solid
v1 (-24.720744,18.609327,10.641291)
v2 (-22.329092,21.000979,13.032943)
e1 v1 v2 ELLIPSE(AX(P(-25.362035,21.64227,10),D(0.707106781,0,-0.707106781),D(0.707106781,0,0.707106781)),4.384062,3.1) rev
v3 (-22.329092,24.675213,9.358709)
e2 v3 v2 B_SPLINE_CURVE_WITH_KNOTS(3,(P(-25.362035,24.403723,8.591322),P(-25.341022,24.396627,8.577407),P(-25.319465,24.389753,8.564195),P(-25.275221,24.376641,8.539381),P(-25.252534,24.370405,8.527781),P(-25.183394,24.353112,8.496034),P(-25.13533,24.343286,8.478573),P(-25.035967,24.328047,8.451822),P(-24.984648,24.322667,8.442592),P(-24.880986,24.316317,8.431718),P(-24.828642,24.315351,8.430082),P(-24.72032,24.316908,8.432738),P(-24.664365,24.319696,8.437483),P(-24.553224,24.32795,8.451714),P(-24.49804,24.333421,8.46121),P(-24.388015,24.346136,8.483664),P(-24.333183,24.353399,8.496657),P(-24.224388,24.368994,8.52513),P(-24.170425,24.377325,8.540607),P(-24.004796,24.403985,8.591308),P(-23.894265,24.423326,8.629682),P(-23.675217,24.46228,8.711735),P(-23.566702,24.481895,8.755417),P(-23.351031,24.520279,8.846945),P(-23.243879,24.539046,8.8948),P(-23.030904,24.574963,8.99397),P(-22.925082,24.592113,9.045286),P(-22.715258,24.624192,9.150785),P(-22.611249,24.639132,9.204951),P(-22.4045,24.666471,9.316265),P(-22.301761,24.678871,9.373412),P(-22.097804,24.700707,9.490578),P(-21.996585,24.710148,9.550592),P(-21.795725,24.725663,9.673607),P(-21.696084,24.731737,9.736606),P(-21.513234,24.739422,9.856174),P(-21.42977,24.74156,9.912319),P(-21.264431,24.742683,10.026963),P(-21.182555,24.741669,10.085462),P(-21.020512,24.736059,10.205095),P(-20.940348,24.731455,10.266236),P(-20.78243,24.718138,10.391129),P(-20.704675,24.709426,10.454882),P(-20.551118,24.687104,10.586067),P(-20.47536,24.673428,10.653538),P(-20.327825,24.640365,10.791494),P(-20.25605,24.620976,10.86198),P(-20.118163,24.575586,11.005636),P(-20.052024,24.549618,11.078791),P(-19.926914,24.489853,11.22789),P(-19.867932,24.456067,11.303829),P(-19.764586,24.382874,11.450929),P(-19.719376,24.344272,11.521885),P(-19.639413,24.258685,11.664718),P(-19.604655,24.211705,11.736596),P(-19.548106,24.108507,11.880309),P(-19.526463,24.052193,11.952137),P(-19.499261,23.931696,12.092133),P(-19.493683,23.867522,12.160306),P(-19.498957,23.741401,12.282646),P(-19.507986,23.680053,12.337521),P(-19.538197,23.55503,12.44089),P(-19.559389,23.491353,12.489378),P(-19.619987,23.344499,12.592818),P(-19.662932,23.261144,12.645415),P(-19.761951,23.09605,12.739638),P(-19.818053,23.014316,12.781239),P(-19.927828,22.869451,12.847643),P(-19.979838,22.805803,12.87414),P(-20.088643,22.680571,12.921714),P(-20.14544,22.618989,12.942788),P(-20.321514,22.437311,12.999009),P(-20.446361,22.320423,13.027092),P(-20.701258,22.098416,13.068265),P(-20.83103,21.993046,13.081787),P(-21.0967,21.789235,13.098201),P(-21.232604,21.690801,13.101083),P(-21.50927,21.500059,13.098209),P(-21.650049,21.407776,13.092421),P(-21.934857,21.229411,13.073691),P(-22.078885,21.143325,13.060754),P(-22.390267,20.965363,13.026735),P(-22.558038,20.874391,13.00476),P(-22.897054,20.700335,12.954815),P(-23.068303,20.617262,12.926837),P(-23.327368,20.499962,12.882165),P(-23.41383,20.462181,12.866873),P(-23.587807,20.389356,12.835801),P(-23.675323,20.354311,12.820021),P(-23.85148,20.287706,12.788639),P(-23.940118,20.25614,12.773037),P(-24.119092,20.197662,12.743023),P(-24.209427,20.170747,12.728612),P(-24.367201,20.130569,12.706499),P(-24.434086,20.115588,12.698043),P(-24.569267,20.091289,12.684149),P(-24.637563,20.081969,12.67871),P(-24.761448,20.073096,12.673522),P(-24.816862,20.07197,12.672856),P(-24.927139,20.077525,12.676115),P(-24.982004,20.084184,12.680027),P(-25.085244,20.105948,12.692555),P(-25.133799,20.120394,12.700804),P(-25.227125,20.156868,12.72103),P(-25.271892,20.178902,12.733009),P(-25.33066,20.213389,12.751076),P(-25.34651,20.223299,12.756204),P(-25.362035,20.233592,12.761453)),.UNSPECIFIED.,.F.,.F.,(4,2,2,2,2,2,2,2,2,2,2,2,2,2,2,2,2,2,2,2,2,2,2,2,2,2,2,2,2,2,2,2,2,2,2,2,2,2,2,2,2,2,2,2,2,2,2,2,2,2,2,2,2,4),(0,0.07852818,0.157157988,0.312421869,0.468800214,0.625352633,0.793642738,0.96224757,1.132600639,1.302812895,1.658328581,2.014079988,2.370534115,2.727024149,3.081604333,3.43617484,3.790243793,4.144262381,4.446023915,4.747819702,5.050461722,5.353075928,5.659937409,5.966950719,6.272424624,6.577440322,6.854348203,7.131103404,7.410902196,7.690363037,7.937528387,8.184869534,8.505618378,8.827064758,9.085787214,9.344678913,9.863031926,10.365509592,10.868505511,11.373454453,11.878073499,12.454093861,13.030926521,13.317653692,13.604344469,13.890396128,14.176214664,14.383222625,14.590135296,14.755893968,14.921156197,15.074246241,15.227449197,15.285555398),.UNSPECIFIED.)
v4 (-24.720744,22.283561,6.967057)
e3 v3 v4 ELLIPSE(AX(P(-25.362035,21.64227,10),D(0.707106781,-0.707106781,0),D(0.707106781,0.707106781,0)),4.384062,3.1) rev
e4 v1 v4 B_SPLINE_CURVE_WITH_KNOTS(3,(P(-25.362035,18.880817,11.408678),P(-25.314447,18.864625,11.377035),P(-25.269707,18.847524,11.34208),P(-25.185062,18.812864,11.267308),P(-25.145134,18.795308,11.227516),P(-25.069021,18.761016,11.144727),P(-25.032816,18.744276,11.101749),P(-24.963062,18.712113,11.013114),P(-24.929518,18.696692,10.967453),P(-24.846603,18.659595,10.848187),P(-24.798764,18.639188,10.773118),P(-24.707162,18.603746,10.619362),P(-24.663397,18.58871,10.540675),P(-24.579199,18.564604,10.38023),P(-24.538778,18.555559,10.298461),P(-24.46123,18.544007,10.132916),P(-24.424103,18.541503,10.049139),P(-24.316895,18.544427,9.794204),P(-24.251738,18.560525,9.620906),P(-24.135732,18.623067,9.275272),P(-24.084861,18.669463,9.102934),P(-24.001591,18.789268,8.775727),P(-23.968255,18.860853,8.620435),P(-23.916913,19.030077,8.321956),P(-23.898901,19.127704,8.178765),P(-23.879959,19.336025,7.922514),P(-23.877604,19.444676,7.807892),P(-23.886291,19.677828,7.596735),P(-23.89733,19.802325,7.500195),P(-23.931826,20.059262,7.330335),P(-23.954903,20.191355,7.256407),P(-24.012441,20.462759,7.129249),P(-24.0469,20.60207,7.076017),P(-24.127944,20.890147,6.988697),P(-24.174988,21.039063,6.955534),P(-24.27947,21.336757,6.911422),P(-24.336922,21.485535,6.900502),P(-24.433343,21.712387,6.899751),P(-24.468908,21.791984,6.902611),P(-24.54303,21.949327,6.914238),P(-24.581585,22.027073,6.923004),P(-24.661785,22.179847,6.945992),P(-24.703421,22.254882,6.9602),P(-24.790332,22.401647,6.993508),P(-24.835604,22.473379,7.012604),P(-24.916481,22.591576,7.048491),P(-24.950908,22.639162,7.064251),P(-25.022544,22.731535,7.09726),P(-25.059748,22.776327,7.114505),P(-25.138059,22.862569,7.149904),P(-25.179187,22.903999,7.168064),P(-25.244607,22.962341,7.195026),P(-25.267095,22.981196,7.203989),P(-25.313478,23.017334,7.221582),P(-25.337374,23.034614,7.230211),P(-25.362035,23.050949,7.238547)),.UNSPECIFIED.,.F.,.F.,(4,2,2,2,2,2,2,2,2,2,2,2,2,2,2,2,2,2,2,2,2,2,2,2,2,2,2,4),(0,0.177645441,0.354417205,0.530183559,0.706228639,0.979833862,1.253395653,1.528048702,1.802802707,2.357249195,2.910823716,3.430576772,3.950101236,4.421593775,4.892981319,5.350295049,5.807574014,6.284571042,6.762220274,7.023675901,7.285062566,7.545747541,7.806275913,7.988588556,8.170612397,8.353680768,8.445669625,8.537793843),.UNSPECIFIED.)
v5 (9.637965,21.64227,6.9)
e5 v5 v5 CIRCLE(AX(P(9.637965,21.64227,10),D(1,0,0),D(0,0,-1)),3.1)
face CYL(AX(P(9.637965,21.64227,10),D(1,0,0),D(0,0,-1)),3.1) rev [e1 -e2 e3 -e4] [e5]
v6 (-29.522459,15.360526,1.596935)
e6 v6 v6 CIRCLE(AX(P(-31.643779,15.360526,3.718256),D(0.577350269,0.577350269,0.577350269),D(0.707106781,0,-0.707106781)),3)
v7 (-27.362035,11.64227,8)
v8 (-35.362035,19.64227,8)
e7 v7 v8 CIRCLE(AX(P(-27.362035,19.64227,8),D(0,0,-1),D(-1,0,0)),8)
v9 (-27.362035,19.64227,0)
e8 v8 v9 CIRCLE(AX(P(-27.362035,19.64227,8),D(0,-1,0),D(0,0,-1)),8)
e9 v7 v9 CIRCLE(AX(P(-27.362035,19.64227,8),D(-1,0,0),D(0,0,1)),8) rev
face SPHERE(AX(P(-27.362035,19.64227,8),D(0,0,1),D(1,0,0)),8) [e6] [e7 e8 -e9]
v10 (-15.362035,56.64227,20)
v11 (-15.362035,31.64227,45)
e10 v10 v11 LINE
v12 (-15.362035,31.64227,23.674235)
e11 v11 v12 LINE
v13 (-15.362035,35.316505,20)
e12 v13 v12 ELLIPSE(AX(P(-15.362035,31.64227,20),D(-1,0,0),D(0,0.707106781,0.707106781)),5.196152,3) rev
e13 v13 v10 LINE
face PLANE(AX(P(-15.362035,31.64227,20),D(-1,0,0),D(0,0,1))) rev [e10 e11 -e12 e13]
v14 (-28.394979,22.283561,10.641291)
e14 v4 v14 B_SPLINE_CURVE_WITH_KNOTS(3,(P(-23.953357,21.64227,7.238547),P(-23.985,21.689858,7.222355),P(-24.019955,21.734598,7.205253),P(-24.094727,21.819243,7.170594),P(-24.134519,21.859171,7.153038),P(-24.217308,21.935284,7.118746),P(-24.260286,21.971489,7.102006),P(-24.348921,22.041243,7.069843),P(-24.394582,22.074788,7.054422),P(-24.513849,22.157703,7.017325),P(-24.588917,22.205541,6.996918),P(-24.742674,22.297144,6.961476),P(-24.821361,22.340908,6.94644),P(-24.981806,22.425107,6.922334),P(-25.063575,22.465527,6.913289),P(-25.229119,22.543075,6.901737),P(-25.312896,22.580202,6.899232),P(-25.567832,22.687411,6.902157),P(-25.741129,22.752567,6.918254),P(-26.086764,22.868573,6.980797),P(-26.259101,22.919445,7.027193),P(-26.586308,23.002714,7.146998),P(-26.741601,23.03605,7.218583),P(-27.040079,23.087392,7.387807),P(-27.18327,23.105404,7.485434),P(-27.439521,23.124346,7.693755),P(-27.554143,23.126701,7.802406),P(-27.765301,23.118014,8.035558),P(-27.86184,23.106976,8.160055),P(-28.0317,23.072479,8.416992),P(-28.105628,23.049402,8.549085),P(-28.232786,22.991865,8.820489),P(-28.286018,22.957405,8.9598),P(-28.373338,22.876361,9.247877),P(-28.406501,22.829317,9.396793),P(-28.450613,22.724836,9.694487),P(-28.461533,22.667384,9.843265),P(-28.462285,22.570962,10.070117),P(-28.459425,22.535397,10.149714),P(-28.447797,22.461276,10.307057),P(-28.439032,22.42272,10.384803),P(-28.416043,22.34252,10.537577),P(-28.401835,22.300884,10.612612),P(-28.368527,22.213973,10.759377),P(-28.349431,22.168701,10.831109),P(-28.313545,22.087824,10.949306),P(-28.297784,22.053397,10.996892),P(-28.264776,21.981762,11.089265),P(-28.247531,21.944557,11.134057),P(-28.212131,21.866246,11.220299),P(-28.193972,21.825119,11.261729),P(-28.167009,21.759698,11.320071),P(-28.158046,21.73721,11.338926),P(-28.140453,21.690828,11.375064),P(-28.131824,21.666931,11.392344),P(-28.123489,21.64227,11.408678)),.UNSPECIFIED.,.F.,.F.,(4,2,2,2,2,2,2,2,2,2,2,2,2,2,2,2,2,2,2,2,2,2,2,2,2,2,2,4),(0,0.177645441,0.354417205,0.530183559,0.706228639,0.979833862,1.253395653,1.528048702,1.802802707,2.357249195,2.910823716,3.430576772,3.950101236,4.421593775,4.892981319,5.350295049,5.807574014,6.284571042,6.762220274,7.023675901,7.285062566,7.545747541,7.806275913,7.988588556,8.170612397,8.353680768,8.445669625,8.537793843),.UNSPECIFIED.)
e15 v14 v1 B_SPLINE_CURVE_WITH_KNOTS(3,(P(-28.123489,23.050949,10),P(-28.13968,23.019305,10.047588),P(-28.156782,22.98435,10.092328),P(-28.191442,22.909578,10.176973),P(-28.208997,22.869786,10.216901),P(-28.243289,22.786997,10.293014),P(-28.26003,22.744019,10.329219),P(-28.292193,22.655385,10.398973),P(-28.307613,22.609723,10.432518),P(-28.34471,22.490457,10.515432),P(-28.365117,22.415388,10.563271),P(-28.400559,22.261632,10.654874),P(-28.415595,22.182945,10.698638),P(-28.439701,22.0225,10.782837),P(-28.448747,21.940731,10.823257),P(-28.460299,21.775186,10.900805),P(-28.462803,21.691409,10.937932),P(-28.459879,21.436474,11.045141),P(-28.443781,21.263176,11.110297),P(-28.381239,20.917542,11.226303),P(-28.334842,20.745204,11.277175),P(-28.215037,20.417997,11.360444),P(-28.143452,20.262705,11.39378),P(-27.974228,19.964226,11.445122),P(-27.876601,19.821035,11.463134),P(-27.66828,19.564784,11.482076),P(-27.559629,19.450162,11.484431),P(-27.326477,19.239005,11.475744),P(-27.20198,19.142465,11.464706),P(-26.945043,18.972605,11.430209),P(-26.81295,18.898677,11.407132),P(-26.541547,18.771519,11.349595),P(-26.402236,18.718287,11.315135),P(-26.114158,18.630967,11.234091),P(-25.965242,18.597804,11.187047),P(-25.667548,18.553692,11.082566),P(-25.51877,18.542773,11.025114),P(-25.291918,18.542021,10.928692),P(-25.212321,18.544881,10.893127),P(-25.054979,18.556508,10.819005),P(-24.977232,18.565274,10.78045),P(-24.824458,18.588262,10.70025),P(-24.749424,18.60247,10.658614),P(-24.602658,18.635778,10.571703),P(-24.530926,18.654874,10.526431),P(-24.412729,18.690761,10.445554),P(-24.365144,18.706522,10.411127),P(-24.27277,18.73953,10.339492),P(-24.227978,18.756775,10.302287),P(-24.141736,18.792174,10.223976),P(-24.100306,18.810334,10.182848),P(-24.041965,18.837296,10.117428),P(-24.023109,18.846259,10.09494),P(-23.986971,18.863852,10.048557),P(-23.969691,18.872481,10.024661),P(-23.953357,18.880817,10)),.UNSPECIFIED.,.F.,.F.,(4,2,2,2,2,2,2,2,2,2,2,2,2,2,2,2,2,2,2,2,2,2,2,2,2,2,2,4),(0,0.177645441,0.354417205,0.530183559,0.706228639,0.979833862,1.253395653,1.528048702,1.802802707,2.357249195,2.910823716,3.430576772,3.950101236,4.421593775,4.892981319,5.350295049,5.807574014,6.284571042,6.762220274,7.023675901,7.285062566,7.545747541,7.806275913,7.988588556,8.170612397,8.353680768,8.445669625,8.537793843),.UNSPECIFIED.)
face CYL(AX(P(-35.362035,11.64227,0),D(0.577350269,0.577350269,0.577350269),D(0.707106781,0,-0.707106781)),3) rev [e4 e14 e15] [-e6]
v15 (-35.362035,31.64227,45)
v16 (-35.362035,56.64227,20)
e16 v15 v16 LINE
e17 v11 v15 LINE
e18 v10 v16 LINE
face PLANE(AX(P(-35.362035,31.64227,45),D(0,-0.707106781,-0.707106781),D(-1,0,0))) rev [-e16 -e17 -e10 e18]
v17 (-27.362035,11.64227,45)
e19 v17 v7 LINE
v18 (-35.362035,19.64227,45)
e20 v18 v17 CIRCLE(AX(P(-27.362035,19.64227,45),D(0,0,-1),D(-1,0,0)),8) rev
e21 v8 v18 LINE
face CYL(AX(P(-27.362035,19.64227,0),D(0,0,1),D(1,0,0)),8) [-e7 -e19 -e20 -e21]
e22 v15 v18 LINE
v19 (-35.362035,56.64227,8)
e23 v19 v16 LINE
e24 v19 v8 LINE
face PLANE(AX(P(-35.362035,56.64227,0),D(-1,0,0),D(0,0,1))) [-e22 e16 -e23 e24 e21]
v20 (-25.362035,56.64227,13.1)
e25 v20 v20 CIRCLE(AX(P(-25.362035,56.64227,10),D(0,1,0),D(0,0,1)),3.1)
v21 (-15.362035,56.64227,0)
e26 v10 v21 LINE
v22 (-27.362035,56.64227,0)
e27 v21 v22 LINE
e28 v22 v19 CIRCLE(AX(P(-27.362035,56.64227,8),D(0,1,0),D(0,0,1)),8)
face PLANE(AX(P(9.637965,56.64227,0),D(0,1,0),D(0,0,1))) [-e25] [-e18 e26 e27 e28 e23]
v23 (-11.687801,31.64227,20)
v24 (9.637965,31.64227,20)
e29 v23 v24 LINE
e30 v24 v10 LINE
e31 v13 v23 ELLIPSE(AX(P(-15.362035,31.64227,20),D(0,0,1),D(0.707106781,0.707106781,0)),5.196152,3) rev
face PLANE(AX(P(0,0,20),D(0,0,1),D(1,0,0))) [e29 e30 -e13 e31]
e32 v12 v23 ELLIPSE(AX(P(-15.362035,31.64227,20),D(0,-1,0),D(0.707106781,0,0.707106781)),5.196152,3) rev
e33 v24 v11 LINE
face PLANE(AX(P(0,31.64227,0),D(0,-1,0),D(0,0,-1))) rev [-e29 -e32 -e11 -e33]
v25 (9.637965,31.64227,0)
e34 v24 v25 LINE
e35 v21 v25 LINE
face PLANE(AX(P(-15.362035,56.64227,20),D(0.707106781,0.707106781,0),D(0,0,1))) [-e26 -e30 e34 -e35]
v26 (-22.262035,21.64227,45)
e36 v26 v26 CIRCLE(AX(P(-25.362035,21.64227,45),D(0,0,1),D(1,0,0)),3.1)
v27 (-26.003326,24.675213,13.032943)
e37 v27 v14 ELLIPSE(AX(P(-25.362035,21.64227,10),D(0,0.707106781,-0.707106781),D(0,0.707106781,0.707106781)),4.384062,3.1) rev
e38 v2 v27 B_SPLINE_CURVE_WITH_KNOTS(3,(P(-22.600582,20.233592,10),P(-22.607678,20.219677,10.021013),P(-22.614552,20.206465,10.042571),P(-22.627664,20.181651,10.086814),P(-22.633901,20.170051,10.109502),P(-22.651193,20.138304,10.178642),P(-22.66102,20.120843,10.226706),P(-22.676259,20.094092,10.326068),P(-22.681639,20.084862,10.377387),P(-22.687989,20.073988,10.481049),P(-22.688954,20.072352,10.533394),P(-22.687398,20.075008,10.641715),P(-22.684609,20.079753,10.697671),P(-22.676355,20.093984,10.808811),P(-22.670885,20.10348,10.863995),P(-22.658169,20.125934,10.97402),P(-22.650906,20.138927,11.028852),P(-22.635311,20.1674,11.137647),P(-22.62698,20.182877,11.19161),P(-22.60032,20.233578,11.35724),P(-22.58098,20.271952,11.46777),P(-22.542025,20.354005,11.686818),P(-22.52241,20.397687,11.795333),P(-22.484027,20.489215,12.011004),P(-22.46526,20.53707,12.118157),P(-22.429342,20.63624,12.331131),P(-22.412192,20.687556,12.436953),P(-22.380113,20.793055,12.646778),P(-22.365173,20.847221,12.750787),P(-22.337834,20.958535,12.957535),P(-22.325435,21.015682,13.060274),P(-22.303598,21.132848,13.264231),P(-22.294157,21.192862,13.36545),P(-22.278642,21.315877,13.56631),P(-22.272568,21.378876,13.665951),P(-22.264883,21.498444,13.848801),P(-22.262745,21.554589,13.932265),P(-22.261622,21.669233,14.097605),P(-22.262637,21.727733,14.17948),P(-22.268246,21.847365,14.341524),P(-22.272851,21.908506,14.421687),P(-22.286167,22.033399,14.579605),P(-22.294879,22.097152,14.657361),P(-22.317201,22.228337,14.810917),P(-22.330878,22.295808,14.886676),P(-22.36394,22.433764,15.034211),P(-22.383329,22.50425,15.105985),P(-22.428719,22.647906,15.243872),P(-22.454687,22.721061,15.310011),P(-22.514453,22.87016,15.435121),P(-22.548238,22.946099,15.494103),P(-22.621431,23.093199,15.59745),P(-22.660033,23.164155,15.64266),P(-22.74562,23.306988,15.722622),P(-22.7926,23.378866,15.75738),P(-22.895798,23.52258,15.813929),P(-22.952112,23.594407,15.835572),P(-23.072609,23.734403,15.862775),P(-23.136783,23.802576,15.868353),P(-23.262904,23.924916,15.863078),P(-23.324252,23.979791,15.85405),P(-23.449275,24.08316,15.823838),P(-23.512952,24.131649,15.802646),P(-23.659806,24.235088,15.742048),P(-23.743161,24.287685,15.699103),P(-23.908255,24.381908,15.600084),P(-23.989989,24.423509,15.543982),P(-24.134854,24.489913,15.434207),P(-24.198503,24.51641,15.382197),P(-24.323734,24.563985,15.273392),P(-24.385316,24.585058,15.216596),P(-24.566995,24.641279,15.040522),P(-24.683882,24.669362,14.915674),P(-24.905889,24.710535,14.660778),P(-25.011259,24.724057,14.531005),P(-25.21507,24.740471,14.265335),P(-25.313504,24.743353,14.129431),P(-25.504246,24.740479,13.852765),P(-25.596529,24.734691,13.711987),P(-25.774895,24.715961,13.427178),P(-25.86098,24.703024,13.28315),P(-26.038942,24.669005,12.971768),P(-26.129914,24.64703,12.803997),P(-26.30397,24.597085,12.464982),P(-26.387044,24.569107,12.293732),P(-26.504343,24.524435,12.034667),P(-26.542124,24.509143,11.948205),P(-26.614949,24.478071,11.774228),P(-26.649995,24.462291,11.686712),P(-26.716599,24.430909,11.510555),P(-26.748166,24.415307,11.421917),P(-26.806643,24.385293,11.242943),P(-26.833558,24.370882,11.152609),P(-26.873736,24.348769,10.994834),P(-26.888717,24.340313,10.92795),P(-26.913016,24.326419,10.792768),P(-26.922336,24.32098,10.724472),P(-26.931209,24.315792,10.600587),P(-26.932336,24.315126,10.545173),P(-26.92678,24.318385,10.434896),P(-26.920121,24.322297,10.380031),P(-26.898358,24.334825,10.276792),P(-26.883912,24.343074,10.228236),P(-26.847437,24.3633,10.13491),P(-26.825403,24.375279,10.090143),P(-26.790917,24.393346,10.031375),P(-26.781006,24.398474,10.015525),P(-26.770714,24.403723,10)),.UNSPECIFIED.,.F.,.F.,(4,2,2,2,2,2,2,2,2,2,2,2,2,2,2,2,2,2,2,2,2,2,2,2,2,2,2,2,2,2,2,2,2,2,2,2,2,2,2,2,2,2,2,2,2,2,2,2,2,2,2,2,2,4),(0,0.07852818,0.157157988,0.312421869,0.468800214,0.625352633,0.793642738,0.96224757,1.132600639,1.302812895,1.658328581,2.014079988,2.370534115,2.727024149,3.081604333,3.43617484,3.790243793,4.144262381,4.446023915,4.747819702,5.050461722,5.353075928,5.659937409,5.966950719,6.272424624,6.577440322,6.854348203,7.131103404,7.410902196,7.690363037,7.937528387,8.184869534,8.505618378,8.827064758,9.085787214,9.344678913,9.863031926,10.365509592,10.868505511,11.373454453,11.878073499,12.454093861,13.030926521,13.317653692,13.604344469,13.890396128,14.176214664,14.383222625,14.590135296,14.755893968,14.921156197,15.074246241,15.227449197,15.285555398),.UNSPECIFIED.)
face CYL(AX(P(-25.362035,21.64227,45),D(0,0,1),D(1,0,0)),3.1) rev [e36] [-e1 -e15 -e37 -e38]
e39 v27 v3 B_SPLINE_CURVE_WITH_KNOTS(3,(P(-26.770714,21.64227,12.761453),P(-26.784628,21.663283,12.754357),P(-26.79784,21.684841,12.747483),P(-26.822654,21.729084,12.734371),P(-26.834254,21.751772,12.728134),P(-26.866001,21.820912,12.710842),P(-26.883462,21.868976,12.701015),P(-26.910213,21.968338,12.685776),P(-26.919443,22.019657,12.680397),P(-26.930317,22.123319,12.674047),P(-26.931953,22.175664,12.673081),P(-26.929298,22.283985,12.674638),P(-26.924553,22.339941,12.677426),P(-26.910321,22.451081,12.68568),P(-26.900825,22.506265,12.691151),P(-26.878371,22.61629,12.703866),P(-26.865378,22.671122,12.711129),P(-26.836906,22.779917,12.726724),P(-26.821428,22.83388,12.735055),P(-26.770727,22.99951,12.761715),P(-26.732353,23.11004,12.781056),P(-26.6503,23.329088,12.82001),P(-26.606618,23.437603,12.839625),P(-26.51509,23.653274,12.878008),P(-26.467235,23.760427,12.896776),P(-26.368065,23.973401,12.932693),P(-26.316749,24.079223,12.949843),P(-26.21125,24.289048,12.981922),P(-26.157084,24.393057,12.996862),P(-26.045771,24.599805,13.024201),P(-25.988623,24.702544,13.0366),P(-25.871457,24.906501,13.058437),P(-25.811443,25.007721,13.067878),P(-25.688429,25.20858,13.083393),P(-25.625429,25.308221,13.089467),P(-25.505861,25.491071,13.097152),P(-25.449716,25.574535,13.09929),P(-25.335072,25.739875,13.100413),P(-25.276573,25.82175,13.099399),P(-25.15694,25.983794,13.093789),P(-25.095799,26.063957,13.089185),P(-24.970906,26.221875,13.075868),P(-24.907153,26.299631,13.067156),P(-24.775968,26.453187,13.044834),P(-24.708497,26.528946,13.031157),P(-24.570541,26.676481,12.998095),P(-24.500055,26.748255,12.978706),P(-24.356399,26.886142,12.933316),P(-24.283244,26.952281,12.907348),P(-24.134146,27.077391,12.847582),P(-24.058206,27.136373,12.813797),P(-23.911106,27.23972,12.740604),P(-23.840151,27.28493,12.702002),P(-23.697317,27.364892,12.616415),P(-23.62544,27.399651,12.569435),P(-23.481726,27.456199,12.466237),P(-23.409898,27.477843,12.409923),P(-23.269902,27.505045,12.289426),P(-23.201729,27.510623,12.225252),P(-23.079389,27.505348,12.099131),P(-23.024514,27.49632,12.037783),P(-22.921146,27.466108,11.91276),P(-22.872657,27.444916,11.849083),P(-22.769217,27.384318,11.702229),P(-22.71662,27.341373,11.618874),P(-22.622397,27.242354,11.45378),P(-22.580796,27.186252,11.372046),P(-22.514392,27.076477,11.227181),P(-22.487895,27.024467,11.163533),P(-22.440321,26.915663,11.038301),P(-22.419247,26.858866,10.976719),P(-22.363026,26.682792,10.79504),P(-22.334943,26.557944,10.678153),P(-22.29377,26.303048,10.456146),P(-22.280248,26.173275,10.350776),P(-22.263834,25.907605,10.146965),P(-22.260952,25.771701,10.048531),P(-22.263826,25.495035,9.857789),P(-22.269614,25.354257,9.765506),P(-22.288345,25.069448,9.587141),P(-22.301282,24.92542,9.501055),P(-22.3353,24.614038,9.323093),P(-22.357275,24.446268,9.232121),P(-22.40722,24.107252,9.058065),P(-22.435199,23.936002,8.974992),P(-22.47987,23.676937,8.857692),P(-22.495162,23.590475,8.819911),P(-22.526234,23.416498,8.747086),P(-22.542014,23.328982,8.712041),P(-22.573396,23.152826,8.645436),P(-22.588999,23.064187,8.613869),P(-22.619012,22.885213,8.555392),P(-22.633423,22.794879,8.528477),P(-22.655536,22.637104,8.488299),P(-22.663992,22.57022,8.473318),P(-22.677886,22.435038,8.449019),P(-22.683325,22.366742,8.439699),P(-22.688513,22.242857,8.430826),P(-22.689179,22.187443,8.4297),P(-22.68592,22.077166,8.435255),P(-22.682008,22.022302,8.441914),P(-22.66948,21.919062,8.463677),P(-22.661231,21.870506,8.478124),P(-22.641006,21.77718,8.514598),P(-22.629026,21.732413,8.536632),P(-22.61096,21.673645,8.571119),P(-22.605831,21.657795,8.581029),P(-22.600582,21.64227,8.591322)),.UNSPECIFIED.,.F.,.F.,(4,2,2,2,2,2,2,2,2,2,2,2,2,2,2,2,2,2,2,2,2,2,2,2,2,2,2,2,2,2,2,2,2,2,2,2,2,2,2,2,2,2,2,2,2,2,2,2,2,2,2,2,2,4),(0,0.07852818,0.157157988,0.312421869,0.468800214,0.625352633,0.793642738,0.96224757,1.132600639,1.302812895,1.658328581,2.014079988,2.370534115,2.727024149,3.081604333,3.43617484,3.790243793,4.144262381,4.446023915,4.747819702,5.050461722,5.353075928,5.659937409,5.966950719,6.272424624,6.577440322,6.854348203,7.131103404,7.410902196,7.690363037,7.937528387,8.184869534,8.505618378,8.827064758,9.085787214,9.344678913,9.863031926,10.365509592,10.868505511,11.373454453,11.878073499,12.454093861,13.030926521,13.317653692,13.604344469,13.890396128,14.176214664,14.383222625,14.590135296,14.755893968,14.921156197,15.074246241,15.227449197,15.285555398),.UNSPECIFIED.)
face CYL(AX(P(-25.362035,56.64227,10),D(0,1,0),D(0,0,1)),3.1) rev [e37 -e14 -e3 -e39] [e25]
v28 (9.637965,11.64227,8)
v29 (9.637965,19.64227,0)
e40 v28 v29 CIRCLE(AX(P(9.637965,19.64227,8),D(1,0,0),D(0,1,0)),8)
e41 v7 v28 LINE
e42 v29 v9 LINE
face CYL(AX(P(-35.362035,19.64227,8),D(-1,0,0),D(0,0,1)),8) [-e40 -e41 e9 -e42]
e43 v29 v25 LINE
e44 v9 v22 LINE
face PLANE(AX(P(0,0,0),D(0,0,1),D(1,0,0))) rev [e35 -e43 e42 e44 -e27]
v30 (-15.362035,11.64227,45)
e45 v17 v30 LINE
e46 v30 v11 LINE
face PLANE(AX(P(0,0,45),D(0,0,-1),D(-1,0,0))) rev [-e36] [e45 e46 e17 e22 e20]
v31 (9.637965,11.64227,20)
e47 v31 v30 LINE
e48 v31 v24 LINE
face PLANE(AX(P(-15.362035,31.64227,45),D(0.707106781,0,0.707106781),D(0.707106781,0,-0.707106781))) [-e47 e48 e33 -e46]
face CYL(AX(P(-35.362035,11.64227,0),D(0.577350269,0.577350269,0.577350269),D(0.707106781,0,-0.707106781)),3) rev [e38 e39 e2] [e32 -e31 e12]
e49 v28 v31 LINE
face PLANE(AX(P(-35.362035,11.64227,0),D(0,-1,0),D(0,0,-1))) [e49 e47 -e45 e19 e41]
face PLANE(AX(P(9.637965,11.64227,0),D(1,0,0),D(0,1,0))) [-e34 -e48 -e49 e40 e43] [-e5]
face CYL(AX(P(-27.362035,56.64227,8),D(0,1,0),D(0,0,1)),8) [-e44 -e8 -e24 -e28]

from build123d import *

# Parameters (mm, degrees)
ESBO_O1_W                        = 45
ESBO_O1_H                        = 45
RESSALTO_EXTRUS_O1_DEPTH         = 20
ESBO_O2_W                        = 25
ESBO_O2_H                        = 25
CORTE_EXTRUS_O1_DEPTH            = 70.705238631
ESBO_O3_W                        = 20
ESBO_O3_H                        = 20
RESSALTO_EXTRUS_O2_DEPTH         = 25
FURO_DE_DI_METRO_6_2_6_2_1_D     = 6.2
FURO_DE_DI_METRO_6_2_6_2_1_DEPTH = 35
FURO_DE_DI_METRO_6_2_6_2_2_D     = 6.2
FURO_DE_DI_METRO_6_2_6_2_2_DEPTH = 35
FURO_DE_DI_METRO_6_2_6_2_3_D     = 6.2
FURO_DE_DI_METRO_6_2_6_2_3_DEPTH = 35
FILETE2_R                        = 8
CHANFRO1_SIZE                    = 25
CHANFRO2_SIZE                    = 25
RESSALTO_EXTRUS_O3_DEPTH         = 20
ESBO_O12_R                       = 3
CORTE_EXTRUS_O2_DEPTH            = 71.906960985


# Some blends are built 0.0001 mm under size
with BuildPart() as part:
    # Esboço1 → Ressalto-extrusão1 (new body)
    with BuildSketch(Plane.XY.offset(20)):
        with Locations((-12.862035225, 34.142270059)):
            Rectangle(ESBO_O1_W, ESBO_O1_H)
    extrude(amount=-RESSALTO_EXTRUS_O1_DEPTH)

    # Esboço2 → Corte-extrusão1 (cut, through all)
    with BuildSketch(Plane(origin=(0, 0, 0), x_dir=(-1, 0, 0), z_dir=(0, 0, -1))):
        with Locations((2.862035225, 44.142270059)):
            Rectangle(ESBO_O2_W, ESBO_O2_H)
    extrude(amount=-CORTE_EXTRUS_O1_DEPTH, mode=Mode.SUBTRACT)

    # Esboço3 → Ressalto-extrusão2 (add)
    with BuildSketch(Plane.XY.offset(20)):
        with Locations((-25.362035225, 21.642270059)):
            Rectangle(ESBO_O3_W, ESBO_O3_H)
    extrude(amount=RESSALTO_EXTRUS_O2_DEPTH)

    # Furo de diâmetro Ø6.2 (6.2)1
    with Locations(Plane(origin=(9.637964775, 0, 0), x_dir=(0, 0, -1), z_dir=(1, 0, 0))):
        with Locations((-10, 21.642270059)):
            Hole(FURO_DE_DI_METRO_6_2_6_2_1_D / 2, depth=FURO_DE_DI_METRO_6_2_6_2_1_DEPTH)

    # Furo de diâmetro Ø6.2 (6.2)2
    with Locations(Plane(origin=(0, 56.642270059, 0), x_dir=(1, 0, 0), z_dir=(0, 1, 0))):
        with Locations((-25.362035225, -10)):
            Hole(FURO_DE_DI_METRO_6_2_6_2_2_D / 2, depth=FURO_DE_DI_METRO_6_2_6_2_2_DEPTH)

    # Furo de diâmetro Ø6.2 (6.2)3
    with Locations(Plane.XY.offset(45)):
        with Locations((-25.362035225, 21.642270059)):
            Hole(FURO_DE_DI_METRO_6_2_6_2_3_D / 2, depth=FURO_DE_DI_METRO_6_2_6_2_3_DEPTH)

    # Filete2
    filete2_edges = [part.edges().sort_by_distance(p)[0] for p in [
        (-35.362035225, 34.142270059, 0),
        (-12.862035225, 11.642270059, 0),
        (-35.362035225, 11.642270059, 22.5),
    ]]
    fillet(filete2_edges, radius=FILETE2_R)

    # Chanfro1
    # the kernel refuses this chamfer: 25 mm, written as the material it adds along each edge
    with BuildSketch(Plane(origin=(-35.362035225, 31.642270059, 20), x_dir=(0, -0.027495876610586317, 0.9996219169112966), z_dir=(1, 0, 0))) as chanfro1_piece_1_section:
        Polygon((CHANFRO1_SIZE * 0.999621916911, -CHANFRO1_SIZE * 0.0274958766106), (-CHANFRO1_SIZE * 0.0274958766106, -CHANFRO1_SIZE * 0.999621916911), (0, 0), align=None)
    chanfro1_piece_1 = extrude(amount=20, mode=Mode.PRIVATE)
    chanfro1_piece_1 = split(chanfro1_piece_1, bisect_by=Plane(origin=(-25.362035225, 39.873368248, 45), z_dir=(0, 0, -1)), keep=Keep.TOP, mode=Mode.PRIVATE)
    chanfro1_piece_1 = split(chanfro1_piece_1, bisect_by=Plane(origin=(-25.362035225, 56.642270059, 28.231098189), z_dir=(0, -1, 0)), keep=Keep.TOP, mode=Mode.PRIVATE)
    add(chanfro1_piece_1)

    # Chanfro2
    chanfro2_edges = [part.edges().sort_by_distance(p)[0] for p in [
        (-15.362035225, 31.642270059, 10),
    ]]
    chamfer(chanfro2_edges, length=CHANFRO2_SIZE - 0.0001)  # a hair under: the kernel refuses the full size

    # Esboço10 → Ressalto-extrusão3 (add)
    with BuildSketch(Plane.XZ.offset(-11.642270059)):
        Polygon((-15.362035225, 45), (9.637964775, 20), (-15.362035225, 20), align=None)
    extrude(amount=-RESSALTO_EXTRUS_O3_DEPTH)

    # Esboço12 → Corte-extrusão2 (cut, through all)
    with BuildSketch(Plane(origin=(20.426744945, 20.426744945, 20.426744945), x_dir=(-0.8164965809277259, 0.408248290463863, 0.4082482904638632), z_dir=(-0.577350269189626, -0.5773502691896256, -0.5773502691896258))):
        with Locations(Location((33.625917704, 8.232328107, 0), (0, 0, 120.000005232))):
            Circle(ESBO_O12_R)
    extrude(amount=CORTE_EXTRUS_O2_DEPTH, mode=Mode.SUBTRACT)


solid = part.part
